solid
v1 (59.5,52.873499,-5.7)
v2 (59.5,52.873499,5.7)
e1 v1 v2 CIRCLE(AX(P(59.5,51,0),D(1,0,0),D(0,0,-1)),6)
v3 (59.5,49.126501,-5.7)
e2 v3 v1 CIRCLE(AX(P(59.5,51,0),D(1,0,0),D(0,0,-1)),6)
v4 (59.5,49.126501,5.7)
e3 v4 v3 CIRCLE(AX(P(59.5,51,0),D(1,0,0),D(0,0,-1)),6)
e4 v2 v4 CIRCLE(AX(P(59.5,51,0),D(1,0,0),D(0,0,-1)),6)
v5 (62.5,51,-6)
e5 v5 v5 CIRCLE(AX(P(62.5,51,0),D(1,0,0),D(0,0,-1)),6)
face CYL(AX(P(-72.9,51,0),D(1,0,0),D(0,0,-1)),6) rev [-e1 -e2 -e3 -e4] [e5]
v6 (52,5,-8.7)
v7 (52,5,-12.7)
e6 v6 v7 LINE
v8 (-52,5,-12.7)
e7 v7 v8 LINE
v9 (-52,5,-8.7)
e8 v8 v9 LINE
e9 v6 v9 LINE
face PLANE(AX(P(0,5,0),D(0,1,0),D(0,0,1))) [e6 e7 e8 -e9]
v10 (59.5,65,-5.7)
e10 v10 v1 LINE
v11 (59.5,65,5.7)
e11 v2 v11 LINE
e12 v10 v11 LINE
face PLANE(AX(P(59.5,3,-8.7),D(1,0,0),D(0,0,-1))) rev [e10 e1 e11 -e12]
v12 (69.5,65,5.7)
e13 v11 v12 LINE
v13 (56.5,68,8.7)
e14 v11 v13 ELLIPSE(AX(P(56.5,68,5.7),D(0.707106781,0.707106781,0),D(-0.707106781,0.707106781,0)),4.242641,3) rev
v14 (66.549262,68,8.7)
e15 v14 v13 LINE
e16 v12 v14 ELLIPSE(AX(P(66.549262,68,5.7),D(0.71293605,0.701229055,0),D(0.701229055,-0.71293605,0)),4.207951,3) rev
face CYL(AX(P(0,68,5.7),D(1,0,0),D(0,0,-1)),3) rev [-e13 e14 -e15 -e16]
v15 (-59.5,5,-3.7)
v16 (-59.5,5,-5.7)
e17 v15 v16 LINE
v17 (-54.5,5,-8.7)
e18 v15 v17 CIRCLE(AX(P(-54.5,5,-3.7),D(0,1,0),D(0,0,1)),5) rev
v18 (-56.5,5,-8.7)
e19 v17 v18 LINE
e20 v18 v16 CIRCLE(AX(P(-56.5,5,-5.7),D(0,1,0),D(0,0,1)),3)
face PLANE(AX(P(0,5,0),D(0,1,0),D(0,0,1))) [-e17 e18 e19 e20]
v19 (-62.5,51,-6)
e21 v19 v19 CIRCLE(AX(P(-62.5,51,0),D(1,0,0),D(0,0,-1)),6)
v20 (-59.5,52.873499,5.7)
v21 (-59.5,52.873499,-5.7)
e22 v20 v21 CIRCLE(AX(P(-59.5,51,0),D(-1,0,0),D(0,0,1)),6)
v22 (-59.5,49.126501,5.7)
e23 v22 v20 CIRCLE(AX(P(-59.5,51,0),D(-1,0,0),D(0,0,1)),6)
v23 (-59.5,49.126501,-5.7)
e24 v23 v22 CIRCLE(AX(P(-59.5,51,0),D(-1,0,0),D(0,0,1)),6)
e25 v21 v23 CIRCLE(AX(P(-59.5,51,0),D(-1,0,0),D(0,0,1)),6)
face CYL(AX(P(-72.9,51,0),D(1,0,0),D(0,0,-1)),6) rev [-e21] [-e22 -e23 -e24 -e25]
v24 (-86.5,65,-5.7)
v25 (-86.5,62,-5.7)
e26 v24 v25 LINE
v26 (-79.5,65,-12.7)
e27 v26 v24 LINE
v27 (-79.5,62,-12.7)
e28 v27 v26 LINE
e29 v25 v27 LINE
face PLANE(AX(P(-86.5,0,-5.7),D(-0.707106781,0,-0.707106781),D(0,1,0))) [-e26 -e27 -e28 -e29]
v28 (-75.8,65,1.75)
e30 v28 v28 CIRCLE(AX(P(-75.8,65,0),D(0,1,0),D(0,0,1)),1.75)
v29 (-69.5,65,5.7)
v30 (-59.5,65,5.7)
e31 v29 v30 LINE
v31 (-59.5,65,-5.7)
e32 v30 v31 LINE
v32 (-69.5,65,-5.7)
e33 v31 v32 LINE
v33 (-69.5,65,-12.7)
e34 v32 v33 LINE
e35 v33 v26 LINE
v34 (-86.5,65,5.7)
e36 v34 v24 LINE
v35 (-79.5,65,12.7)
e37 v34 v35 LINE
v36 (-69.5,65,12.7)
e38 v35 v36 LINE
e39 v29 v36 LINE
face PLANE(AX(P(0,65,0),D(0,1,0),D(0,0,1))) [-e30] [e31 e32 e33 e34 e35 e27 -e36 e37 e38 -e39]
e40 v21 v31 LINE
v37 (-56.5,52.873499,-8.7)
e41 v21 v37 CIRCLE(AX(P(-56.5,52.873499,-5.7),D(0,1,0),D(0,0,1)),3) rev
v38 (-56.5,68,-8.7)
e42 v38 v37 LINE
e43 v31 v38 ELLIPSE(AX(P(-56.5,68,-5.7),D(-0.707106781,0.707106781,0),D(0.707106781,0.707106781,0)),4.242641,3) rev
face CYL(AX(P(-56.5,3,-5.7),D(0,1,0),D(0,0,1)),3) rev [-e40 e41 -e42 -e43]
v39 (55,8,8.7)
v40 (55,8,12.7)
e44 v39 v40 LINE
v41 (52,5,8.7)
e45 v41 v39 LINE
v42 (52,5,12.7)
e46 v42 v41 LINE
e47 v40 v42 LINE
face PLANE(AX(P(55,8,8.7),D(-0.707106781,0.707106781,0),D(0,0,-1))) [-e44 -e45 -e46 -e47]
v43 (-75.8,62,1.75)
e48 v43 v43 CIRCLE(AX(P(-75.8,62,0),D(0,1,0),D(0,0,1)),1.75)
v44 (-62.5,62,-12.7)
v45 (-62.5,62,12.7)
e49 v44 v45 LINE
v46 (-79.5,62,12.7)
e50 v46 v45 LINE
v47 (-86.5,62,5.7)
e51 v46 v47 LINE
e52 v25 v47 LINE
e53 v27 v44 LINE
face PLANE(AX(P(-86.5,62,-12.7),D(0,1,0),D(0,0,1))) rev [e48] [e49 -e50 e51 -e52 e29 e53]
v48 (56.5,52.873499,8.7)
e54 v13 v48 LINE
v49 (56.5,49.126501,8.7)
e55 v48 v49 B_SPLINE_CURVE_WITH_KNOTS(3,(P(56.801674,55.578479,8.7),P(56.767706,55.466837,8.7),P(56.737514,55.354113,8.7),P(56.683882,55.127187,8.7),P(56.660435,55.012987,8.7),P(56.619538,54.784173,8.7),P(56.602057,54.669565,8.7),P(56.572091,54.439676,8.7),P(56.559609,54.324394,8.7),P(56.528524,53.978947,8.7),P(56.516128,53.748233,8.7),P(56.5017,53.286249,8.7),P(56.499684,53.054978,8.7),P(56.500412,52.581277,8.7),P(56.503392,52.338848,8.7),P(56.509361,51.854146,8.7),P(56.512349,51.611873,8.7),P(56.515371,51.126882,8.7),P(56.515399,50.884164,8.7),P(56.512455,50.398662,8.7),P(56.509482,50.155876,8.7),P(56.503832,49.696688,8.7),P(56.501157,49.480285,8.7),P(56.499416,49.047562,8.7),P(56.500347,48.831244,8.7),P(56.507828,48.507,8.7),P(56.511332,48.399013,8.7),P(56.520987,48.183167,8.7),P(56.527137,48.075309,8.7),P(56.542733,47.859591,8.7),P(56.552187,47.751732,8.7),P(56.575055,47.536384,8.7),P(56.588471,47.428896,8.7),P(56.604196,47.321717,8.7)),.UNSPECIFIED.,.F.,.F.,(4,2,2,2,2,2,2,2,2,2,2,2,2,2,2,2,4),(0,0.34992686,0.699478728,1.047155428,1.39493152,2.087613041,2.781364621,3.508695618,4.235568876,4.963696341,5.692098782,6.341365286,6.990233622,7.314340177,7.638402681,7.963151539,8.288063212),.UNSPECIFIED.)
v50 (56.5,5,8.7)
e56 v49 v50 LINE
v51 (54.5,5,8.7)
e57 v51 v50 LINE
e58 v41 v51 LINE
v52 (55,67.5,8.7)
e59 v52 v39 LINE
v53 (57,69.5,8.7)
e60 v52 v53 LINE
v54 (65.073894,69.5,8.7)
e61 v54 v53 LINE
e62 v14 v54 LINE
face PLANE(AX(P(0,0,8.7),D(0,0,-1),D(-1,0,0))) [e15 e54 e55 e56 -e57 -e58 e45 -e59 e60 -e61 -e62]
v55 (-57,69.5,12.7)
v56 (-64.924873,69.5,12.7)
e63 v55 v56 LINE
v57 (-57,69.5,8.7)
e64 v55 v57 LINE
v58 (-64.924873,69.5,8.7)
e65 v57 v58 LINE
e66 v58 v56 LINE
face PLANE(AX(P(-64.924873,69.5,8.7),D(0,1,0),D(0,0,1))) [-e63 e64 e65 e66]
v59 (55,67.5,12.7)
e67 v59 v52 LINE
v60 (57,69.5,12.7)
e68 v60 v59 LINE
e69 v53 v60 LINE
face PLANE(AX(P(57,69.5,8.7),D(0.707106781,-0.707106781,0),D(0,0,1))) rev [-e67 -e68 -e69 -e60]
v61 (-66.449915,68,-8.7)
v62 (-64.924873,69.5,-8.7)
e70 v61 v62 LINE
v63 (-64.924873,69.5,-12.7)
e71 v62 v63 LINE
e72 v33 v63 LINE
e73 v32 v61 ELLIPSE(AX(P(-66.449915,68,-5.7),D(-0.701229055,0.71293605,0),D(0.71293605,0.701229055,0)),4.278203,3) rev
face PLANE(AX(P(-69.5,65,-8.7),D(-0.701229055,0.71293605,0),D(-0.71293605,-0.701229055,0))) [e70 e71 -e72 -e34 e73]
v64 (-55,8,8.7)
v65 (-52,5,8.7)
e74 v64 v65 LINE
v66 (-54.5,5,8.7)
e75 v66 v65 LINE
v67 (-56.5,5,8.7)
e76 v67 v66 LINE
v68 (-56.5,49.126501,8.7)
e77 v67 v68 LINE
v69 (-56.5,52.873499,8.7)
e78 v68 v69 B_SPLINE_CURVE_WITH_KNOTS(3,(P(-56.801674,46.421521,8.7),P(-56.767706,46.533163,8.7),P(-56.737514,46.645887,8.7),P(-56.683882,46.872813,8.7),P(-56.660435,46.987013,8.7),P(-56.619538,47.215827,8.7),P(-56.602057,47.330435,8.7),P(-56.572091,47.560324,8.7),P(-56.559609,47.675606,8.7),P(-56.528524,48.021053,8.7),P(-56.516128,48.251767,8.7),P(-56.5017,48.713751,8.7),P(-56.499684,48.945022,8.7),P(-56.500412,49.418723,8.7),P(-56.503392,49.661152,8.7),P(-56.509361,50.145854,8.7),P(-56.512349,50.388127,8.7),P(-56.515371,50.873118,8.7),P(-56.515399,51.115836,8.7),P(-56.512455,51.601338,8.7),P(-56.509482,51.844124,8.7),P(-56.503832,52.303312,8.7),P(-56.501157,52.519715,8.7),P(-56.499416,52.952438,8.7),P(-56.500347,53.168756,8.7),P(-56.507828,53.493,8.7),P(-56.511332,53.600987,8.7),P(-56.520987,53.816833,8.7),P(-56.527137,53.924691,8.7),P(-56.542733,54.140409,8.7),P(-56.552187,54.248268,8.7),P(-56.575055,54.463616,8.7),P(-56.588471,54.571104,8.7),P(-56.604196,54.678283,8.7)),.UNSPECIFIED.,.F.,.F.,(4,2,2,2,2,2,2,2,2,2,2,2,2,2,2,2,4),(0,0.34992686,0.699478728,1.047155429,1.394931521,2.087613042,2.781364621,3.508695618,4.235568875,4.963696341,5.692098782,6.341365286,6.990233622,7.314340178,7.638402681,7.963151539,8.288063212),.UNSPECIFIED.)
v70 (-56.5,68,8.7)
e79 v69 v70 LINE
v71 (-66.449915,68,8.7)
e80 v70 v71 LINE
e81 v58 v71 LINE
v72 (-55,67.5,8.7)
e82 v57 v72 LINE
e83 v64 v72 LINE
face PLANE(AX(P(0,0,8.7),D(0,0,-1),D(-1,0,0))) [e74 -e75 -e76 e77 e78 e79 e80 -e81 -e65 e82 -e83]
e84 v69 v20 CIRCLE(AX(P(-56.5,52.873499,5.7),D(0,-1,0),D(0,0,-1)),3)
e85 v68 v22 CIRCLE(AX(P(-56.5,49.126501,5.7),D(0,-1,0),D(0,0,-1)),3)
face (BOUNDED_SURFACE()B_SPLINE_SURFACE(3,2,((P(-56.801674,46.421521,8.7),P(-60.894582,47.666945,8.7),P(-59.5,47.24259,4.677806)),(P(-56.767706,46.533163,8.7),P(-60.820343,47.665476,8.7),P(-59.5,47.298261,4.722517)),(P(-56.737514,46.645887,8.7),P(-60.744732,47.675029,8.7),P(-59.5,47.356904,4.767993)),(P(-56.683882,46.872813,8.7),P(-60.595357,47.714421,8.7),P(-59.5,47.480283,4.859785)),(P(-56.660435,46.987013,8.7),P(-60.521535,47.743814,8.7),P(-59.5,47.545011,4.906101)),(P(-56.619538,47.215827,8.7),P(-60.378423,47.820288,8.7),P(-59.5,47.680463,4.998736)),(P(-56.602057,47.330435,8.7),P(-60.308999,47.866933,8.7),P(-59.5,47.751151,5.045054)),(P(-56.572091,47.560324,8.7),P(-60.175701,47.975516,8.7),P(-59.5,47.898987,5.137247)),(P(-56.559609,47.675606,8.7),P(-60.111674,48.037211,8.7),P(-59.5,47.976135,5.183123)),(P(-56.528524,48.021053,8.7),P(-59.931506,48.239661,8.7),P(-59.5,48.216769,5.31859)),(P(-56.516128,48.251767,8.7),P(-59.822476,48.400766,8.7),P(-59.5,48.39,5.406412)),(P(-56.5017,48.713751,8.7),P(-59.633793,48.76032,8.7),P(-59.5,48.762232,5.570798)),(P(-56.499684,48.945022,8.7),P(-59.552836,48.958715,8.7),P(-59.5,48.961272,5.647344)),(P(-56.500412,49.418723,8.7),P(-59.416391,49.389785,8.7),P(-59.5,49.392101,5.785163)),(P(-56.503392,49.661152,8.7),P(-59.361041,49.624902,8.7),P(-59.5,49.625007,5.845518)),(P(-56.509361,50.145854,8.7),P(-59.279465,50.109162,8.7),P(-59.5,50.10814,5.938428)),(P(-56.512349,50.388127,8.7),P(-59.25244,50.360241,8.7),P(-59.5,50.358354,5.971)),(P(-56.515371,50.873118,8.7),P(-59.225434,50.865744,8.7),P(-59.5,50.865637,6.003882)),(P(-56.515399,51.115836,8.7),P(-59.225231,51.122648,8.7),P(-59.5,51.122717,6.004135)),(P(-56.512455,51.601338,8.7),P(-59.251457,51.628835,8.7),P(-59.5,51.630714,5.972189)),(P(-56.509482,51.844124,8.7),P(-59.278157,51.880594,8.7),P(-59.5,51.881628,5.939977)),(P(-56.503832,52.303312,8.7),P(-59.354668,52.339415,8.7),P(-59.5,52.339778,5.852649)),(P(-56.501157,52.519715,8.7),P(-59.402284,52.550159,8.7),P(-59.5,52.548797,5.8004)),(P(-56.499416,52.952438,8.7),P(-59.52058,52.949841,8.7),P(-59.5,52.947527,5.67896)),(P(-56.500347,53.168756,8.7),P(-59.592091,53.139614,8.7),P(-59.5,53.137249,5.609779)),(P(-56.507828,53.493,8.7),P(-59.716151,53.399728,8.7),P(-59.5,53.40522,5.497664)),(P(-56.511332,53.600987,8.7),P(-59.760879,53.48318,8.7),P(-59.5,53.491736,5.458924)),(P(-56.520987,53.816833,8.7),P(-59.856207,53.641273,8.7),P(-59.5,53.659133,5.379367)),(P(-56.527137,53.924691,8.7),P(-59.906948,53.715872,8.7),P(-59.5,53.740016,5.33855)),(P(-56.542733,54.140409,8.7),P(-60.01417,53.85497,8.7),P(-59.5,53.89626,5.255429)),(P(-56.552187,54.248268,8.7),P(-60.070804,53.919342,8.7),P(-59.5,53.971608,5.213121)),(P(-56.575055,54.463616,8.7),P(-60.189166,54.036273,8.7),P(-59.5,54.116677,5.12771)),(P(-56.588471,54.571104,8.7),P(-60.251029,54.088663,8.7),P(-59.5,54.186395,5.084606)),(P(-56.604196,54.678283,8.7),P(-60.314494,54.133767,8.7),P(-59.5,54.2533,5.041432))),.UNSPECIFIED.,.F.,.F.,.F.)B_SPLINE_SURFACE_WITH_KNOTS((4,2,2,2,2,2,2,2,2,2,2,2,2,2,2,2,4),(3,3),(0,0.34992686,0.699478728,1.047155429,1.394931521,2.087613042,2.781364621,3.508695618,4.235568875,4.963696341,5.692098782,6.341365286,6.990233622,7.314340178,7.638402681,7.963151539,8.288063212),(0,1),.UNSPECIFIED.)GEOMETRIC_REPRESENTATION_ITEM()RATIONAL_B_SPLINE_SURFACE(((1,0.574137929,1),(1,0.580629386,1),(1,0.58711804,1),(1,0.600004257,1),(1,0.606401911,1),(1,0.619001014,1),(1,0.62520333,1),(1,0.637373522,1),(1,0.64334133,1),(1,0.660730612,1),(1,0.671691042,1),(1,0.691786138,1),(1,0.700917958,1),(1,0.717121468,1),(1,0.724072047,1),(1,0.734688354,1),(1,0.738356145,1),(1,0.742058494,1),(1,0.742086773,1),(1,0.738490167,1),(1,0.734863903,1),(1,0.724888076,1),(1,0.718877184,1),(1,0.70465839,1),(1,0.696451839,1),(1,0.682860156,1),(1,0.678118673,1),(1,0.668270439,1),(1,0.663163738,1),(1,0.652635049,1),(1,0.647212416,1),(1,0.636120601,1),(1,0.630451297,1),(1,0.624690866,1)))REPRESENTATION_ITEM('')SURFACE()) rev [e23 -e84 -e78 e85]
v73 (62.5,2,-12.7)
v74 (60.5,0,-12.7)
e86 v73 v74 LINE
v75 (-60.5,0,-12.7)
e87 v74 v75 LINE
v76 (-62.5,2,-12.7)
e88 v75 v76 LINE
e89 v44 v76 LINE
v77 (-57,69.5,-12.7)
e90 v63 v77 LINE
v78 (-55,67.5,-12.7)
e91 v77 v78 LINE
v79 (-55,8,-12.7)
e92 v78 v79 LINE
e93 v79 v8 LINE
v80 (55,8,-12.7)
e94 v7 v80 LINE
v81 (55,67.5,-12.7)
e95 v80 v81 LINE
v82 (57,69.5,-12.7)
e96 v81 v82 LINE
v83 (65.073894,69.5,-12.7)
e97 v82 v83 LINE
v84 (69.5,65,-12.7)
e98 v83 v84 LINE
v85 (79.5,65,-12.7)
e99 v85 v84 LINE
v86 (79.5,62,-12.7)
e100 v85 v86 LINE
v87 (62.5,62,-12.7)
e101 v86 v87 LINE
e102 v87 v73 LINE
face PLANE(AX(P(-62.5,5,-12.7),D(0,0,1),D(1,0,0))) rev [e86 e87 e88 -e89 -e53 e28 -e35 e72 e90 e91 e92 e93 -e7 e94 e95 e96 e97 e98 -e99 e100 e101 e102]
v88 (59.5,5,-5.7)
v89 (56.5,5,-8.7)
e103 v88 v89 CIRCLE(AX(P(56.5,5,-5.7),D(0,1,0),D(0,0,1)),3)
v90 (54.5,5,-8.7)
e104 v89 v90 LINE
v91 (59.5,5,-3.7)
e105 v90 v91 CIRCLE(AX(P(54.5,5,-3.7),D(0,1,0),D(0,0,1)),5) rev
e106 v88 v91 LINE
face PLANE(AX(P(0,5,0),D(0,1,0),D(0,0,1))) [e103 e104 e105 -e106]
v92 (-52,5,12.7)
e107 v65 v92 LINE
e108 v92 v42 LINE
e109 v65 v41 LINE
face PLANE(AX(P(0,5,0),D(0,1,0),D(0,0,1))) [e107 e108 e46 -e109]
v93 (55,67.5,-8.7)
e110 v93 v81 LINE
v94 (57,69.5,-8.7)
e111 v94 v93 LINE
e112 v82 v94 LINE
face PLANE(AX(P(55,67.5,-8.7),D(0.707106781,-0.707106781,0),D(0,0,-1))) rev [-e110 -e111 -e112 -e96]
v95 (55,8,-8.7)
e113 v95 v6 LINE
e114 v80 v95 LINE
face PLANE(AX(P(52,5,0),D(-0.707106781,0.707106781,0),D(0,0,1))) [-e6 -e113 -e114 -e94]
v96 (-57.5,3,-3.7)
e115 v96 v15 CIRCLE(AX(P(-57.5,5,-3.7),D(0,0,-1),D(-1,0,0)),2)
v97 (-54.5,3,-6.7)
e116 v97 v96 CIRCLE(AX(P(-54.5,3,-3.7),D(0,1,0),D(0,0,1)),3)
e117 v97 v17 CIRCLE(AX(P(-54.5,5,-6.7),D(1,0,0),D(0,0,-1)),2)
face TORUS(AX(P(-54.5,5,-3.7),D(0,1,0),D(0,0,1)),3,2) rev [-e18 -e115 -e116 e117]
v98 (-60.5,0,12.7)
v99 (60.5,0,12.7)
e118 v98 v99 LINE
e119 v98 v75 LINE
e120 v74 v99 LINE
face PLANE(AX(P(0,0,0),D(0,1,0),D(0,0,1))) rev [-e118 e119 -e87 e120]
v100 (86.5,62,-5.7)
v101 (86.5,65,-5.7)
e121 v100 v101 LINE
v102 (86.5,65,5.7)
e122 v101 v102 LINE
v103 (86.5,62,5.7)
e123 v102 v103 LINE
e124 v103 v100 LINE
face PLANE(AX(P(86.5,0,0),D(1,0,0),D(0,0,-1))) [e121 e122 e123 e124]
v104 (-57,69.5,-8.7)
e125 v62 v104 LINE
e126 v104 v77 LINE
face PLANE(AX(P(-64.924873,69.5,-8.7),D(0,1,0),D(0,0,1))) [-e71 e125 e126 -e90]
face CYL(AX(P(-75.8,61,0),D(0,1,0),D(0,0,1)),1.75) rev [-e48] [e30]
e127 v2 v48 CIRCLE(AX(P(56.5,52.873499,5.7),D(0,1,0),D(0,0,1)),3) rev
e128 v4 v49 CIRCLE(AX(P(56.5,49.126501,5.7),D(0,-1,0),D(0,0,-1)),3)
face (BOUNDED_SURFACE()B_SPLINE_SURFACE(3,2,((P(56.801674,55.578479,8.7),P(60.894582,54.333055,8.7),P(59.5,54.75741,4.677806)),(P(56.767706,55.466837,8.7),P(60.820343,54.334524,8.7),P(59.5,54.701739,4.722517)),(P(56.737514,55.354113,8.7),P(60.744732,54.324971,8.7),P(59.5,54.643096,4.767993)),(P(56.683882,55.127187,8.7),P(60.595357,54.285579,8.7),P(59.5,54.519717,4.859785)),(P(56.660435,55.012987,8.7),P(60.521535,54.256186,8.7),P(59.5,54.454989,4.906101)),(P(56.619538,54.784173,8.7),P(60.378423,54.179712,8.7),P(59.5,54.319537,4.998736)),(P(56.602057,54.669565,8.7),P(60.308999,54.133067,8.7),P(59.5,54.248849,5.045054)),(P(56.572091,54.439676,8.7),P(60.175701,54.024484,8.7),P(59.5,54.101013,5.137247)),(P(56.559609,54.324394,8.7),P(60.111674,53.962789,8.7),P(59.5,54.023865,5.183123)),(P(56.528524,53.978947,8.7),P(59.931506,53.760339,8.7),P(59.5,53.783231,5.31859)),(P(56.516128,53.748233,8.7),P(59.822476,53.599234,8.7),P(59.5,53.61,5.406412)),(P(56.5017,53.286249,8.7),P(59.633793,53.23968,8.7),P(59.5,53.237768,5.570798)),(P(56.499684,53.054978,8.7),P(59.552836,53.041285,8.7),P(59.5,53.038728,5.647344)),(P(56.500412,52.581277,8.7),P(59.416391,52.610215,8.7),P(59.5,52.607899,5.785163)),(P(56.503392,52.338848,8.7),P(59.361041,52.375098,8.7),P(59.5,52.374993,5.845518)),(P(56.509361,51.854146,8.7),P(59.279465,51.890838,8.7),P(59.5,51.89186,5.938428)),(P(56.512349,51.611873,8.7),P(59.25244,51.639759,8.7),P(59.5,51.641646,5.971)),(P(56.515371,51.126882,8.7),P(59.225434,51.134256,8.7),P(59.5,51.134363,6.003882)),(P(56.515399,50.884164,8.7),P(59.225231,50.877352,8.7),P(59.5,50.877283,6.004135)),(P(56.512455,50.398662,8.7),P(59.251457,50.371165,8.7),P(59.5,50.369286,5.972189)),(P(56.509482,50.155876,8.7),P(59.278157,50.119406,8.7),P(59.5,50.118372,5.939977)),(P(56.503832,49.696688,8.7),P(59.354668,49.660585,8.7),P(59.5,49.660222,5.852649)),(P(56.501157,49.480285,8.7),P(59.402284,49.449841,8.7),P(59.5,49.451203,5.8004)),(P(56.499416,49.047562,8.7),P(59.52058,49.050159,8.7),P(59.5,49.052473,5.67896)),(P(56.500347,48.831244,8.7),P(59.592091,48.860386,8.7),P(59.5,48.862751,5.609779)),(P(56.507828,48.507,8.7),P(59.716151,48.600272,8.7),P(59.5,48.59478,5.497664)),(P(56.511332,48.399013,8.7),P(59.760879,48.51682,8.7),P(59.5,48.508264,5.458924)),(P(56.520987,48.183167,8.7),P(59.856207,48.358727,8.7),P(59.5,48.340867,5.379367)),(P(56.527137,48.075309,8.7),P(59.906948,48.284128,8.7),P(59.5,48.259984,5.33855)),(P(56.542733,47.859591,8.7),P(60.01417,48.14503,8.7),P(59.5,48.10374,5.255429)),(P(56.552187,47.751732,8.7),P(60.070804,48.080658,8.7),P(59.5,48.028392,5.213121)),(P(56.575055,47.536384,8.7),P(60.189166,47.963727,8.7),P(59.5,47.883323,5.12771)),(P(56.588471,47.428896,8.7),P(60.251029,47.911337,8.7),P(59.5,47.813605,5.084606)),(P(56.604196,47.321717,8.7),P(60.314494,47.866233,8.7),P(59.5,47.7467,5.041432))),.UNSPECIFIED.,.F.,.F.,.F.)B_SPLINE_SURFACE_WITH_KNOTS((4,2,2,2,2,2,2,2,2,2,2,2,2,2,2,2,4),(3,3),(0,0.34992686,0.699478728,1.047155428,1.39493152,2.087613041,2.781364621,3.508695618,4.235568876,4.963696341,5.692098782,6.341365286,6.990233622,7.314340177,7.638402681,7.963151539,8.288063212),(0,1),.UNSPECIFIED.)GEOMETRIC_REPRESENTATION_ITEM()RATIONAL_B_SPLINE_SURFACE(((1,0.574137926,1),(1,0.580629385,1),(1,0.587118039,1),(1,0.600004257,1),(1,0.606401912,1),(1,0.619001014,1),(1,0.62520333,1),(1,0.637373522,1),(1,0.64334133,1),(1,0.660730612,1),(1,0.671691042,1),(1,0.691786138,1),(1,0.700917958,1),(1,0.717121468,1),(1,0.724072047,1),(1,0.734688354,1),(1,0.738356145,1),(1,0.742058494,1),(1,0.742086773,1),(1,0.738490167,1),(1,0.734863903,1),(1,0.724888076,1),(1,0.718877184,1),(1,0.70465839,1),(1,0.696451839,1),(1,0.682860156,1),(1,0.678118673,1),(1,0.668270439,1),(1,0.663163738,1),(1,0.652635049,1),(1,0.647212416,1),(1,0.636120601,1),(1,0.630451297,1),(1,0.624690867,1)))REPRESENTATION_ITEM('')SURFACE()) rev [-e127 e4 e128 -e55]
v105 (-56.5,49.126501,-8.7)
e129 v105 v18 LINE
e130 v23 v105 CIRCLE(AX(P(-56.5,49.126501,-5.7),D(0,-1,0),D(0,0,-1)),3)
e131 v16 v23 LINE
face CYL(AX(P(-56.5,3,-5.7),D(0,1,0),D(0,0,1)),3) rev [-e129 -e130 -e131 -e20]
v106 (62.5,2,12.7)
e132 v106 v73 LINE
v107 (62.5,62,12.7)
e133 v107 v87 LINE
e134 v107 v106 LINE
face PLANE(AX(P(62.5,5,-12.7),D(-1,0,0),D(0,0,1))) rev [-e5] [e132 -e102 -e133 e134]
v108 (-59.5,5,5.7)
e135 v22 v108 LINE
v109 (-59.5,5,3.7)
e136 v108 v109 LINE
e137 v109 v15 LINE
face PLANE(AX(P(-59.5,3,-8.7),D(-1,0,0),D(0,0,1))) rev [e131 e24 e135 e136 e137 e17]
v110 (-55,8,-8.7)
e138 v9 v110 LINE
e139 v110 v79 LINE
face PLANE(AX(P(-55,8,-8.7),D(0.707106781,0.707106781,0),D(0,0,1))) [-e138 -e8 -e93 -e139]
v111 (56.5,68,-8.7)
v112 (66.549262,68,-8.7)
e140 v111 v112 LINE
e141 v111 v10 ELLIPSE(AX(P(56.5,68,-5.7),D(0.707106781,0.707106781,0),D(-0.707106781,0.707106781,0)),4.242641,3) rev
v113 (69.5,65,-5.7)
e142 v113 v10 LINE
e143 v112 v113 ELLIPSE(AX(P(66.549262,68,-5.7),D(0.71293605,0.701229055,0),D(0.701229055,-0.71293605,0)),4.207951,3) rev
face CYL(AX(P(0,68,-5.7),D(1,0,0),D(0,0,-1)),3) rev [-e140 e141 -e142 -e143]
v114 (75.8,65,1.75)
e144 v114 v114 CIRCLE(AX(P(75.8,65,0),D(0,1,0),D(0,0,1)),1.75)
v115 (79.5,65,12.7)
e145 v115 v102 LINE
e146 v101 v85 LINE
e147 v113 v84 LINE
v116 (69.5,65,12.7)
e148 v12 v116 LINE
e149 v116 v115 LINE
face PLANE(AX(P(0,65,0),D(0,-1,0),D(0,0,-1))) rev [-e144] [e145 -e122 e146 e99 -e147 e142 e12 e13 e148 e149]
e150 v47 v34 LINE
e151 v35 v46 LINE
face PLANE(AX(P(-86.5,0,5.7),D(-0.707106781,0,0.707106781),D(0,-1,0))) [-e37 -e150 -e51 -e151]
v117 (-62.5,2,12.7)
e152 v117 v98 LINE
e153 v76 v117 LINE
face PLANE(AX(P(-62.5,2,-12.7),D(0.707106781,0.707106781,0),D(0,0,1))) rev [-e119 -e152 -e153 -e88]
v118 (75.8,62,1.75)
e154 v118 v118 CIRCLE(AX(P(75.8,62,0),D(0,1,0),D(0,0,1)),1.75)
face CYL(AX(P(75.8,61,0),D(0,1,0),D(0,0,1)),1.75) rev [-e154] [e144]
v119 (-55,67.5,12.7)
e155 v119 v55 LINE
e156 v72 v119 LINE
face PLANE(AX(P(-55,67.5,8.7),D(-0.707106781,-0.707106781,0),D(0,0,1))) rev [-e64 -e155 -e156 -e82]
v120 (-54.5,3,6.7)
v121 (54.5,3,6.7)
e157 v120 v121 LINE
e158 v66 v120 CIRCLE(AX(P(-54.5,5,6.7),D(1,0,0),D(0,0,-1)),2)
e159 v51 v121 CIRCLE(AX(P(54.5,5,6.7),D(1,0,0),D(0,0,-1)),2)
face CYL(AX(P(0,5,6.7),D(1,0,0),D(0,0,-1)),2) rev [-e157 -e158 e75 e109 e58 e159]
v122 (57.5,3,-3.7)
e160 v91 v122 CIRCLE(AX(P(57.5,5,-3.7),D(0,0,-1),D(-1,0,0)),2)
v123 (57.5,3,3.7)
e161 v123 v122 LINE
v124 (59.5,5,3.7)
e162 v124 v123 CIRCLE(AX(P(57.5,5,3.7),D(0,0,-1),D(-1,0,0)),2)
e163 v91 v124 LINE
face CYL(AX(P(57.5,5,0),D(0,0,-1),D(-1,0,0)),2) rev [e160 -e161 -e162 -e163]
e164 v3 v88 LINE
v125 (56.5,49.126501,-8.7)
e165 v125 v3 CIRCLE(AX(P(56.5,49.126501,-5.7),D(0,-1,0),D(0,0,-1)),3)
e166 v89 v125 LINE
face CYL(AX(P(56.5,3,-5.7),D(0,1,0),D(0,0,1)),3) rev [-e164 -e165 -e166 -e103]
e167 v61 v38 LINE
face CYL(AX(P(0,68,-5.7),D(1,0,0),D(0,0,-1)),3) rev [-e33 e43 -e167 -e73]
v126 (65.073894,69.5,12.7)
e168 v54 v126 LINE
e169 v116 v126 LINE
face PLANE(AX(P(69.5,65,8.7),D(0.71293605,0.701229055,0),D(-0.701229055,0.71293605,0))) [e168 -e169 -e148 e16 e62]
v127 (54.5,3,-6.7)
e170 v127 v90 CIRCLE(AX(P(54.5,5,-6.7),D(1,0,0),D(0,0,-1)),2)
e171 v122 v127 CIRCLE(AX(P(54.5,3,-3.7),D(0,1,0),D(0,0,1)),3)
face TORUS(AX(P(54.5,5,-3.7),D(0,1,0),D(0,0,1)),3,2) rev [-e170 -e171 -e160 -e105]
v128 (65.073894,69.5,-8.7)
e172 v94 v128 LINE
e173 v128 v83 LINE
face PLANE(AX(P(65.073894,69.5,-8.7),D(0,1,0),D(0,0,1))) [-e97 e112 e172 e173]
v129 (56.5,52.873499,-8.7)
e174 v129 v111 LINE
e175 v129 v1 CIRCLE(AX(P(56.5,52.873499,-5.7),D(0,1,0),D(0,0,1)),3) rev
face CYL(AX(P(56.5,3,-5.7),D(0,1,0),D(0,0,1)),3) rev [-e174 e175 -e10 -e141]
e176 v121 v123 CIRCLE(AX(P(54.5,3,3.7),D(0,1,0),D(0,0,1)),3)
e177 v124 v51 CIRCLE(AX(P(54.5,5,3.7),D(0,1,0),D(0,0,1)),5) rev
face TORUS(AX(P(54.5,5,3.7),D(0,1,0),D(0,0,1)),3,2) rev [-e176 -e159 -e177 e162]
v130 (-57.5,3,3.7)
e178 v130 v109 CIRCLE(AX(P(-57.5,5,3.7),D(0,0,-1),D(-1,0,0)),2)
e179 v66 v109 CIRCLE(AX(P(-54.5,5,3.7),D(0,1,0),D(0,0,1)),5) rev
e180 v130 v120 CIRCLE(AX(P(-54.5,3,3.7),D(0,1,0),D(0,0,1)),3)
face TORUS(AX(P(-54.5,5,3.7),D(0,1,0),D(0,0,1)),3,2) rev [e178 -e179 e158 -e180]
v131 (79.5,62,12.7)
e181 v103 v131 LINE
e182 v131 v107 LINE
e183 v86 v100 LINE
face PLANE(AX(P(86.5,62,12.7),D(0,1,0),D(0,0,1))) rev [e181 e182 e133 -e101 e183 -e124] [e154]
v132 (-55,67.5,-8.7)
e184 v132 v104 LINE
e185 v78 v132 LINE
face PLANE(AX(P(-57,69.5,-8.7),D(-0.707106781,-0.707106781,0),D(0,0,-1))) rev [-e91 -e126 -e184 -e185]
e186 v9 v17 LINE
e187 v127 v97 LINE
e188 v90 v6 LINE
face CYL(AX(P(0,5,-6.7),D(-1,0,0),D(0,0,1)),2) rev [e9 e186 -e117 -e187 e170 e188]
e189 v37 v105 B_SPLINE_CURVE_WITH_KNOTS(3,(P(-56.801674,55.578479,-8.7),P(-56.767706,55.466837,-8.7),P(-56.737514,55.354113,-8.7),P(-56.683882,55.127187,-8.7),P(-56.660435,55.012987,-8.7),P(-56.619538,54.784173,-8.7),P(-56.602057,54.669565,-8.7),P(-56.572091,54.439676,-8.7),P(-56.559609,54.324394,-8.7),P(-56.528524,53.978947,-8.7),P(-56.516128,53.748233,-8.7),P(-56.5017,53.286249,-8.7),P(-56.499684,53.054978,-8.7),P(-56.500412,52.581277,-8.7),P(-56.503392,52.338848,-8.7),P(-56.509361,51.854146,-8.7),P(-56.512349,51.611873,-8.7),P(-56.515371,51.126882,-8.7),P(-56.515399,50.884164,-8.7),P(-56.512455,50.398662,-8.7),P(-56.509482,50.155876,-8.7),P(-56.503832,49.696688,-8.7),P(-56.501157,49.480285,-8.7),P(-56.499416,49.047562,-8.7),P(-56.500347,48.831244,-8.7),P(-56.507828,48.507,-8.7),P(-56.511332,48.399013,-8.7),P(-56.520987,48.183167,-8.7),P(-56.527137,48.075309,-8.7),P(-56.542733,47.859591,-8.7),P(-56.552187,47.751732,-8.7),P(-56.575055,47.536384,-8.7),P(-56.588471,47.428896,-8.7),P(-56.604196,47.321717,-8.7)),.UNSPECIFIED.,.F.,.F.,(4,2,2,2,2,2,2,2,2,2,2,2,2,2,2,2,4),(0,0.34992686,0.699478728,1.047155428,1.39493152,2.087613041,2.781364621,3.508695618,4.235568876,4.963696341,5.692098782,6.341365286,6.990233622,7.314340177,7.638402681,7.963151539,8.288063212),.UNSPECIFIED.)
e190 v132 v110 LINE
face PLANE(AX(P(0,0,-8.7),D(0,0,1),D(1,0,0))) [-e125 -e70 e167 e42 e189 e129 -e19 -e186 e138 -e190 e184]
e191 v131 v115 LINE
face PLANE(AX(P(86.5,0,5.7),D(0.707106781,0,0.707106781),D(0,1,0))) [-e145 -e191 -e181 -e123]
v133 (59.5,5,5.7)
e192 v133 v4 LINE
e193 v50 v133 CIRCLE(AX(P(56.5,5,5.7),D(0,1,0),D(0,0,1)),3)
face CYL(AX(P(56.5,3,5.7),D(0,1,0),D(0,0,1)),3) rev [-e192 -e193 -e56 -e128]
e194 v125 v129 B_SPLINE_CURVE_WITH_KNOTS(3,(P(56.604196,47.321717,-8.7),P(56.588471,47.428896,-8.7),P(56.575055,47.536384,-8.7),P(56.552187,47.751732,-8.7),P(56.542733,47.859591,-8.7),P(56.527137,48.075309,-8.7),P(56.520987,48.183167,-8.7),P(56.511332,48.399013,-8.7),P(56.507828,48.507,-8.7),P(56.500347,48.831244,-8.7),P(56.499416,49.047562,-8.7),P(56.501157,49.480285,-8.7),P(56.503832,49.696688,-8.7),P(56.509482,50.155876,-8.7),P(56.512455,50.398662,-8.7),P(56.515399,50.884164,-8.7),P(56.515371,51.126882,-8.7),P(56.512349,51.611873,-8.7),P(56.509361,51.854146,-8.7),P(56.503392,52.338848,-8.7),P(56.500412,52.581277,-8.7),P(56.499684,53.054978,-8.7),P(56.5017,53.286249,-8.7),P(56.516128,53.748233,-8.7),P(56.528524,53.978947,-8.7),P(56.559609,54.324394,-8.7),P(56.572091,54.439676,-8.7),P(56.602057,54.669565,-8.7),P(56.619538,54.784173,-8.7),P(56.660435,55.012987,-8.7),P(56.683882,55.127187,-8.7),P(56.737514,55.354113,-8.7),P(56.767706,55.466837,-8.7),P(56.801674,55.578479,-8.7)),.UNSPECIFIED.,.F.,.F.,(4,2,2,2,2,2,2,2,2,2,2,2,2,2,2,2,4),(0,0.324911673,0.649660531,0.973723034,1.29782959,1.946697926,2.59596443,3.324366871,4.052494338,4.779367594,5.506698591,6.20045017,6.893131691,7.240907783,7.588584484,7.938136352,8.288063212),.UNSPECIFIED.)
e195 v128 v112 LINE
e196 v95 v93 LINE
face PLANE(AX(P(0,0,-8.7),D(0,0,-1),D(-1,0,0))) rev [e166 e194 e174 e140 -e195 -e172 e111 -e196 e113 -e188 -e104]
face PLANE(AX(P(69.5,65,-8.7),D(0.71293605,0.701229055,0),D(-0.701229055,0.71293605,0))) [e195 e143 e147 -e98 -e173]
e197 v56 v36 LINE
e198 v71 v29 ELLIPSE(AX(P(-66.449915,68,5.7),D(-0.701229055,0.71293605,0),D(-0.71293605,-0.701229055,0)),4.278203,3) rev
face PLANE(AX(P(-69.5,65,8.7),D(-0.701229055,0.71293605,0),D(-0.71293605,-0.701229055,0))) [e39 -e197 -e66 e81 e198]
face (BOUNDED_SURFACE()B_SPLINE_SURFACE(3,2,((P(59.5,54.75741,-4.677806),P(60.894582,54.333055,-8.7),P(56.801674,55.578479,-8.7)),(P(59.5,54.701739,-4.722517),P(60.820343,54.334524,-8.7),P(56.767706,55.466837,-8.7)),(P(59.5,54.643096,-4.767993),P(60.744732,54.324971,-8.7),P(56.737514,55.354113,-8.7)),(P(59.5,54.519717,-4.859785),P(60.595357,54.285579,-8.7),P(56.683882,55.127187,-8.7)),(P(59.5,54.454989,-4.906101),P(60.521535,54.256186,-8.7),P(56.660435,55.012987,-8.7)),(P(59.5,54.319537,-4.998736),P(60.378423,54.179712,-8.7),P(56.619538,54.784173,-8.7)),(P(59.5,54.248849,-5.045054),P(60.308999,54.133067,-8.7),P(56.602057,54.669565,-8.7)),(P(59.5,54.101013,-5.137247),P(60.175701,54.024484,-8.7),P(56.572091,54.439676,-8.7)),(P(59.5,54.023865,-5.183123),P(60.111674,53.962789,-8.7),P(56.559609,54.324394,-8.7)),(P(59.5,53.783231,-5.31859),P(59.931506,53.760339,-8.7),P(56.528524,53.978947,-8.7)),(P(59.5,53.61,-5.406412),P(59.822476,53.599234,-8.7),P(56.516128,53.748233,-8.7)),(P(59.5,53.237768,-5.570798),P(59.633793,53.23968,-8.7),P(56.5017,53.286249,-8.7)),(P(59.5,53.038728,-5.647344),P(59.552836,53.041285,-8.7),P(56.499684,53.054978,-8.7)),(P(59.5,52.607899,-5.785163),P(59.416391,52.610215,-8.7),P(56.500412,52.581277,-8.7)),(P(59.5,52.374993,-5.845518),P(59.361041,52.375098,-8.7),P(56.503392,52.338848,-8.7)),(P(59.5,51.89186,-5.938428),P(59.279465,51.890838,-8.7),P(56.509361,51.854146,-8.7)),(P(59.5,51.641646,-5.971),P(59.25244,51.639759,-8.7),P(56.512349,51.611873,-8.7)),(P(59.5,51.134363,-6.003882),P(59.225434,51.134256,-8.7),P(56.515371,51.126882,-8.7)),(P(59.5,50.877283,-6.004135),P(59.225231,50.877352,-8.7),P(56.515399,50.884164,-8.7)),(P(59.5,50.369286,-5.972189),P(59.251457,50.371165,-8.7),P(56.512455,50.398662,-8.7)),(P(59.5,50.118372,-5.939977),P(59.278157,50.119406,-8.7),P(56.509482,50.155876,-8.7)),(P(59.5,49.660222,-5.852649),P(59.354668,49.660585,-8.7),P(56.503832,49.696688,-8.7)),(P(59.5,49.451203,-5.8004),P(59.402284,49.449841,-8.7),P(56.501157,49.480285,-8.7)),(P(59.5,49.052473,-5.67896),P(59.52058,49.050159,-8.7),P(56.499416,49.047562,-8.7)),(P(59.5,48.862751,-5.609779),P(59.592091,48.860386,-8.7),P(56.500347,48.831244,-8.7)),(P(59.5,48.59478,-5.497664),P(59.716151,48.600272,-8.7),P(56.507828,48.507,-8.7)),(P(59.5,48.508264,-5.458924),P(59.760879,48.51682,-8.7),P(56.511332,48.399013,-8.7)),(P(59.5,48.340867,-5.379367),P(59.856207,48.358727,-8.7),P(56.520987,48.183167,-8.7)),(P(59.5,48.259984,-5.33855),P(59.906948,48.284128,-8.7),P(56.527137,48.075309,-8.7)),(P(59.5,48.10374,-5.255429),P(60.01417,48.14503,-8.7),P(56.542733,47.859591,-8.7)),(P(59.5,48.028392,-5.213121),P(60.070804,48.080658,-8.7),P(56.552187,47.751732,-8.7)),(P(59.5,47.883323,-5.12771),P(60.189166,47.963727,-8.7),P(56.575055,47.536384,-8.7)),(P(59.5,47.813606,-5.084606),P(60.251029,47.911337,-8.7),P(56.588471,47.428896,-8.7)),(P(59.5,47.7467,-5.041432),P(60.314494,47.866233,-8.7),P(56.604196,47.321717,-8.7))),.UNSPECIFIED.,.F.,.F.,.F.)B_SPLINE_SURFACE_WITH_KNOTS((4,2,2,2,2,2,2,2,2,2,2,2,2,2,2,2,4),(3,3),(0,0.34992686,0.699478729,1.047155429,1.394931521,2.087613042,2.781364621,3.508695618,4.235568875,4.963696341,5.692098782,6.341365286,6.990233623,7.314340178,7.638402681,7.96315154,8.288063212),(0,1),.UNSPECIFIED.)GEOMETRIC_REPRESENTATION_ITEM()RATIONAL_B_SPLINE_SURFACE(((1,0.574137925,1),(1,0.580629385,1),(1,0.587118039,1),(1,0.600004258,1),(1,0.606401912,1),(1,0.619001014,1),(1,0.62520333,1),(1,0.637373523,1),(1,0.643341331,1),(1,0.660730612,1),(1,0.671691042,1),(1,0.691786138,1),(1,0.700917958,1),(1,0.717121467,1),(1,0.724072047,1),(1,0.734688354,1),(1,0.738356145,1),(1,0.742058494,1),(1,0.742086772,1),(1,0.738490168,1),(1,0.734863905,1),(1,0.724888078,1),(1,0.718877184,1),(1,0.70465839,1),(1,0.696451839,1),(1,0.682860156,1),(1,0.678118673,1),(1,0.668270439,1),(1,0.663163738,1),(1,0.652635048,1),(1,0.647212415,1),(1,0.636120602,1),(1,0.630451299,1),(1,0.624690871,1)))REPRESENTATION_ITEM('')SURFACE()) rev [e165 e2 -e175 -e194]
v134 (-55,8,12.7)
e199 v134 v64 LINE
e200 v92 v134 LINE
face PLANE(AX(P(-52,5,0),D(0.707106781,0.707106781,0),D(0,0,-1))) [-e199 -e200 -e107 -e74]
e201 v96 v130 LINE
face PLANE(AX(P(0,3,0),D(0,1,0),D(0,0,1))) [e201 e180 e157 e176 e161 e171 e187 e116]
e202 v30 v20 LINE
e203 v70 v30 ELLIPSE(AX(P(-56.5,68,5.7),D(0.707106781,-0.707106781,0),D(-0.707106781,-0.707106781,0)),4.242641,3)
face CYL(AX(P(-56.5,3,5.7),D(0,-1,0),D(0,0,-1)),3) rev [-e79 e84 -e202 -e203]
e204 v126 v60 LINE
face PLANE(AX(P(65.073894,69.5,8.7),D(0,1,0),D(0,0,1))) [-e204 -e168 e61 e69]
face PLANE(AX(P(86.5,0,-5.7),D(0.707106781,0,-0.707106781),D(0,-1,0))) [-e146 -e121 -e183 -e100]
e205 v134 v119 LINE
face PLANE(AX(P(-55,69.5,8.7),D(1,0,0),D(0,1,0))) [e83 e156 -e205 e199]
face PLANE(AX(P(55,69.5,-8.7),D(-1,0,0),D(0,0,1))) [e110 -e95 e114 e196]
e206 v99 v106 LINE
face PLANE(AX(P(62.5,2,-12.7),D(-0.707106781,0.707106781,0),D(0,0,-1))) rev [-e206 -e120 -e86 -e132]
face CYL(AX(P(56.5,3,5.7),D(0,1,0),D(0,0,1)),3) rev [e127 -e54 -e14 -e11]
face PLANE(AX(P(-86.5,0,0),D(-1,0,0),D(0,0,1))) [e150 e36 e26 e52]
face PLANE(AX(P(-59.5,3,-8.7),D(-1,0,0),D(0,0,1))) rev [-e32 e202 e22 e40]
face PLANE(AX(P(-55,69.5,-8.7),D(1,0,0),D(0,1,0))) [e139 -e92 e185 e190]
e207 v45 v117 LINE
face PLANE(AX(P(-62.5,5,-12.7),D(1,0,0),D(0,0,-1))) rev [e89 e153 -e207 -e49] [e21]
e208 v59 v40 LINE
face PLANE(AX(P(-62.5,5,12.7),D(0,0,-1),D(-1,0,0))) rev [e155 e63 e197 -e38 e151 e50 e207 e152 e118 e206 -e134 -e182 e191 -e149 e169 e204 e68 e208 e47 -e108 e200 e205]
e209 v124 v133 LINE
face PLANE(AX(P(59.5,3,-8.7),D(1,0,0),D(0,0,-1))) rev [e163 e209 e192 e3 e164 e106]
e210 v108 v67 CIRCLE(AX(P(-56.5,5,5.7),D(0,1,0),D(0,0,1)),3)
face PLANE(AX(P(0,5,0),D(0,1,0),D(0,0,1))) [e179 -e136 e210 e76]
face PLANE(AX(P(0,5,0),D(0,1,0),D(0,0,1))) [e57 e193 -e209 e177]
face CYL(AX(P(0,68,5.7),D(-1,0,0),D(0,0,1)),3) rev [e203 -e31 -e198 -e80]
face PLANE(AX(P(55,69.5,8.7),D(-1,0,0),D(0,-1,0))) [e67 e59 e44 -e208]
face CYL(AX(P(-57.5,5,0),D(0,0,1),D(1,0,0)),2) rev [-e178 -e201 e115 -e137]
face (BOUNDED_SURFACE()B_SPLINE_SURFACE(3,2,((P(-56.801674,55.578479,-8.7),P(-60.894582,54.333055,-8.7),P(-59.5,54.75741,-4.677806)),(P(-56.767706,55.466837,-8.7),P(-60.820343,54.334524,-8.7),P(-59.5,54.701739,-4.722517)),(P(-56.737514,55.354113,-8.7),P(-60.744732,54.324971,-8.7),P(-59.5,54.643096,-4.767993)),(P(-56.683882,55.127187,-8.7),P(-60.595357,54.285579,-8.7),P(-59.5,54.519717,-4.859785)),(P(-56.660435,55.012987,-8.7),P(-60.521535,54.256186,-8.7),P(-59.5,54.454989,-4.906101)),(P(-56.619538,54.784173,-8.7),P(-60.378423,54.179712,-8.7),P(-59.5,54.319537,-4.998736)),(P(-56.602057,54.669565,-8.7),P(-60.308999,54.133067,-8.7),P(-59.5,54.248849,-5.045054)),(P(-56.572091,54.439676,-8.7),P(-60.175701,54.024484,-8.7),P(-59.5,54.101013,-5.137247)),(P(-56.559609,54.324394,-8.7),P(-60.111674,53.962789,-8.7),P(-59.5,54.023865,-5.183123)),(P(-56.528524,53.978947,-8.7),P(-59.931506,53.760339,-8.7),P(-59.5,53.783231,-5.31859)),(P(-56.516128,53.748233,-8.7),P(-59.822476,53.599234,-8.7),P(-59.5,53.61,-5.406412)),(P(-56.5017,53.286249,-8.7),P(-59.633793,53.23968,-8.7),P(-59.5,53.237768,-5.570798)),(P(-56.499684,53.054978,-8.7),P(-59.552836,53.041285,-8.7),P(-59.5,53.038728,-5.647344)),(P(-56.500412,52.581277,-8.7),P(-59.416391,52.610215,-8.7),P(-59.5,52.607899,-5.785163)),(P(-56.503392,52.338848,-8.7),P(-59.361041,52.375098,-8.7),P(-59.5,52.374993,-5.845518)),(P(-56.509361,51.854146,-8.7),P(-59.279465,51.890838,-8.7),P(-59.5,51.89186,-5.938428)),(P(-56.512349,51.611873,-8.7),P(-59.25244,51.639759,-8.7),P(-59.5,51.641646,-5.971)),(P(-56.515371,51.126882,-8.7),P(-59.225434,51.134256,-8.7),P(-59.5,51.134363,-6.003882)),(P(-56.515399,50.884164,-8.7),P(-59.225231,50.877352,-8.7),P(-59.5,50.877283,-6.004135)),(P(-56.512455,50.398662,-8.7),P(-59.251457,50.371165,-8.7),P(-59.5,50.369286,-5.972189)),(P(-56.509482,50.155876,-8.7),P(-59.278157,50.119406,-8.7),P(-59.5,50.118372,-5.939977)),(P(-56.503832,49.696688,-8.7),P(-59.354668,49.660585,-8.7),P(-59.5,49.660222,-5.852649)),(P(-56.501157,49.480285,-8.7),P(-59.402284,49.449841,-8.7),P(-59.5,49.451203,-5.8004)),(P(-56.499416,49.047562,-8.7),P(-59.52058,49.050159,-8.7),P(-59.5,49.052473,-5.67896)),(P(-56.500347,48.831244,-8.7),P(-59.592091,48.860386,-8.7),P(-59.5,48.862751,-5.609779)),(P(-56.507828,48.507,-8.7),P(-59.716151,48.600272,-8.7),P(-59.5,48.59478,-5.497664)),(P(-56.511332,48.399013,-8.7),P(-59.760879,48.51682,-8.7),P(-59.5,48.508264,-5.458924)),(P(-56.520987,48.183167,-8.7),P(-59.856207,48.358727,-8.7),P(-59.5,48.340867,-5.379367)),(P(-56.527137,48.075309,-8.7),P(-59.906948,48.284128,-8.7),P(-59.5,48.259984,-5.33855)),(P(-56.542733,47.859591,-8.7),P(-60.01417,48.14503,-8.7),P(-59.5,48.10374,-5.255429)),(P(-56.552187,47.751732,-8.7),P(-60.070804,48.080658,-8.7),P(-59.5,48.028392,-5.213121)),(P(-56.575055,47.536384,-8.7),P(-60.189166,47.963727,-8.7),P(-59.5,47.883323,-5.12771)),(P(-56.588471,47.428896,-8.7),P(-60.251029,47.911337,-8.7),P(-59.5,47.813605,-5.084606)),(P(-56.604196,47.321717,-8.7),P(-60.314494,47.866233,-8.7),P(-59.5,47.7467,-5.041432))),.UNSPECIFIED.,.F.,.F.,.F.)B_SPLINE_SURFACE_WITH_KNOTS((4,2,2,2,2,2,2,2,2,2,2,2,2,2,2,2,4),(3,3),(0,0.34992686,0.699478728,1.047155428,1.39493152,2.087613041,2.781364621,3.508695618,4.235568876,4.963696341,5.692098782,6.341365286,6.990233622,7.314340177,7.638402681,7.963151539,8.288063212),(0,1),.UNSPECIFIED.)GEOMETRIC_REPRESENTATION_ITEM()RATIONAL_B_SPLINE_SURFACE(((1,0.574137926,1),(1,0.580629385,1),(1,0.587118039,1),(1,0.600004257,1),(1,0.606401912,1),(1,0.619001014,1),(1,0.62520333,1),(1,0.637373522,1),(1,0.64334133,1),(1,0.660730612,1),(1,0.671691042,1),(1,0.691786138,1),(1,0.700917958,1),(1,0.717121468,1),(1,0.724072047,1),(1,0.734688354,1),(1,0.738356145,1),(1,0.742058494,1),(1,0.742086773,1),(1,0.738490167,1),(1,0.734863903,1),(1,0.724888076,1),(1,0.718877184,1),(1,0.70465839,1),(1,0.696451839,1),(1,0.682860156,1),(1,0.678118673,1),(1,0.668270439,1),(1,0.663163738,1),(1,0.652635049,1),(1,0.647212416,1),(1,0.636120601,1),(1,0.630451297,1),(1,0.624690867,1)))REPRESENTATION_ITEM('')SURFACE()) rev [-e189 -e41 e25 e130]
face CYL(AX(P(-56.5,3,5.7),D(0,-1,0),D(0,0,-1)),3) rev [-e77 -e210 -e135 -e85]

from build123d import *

# Parameters (mm, degrees)
SKETCH1_W           = 125
SKETCH1_H           = 25.4
BOSS_EXTRUDE1_DEPTH = 5
SKETCH2_W           = 119
SKETCH2_H           = 17.4
CUT_EXTRUDE1_DEPTH  = 2
FILLET1_R           = 5
SKETCH3_W           = 3
SKETCH3_H           = 25.4
BOSS_EXTRUDE2_DEPTH = 60
CHAMFER1_SIZE       = 2
SKETCH4_R           = 6
CUT_EXTRUDE3_DEPTH  = 135.4
SKETCH5_W           = 25.4
SKETCH5_H           = 3
BOSS_EXTRUDE3_DEPTH = 24
SKETCH6_W           = 25.4
SKETCH6_H           = 3
BOSS_EXTRUDE4_DEPTH = 24
SKETCH9_R           = 1.75
CUT_EXTRUDE4_DEPTH  = 4
CHAMFER2_SIZE       = 7
BOSS_EXTRUDE5_DEPTH = 4
BOSS_EXTRUDE6_DEPTH = 4
CHAMFER3_SIZE       = 2
CHAMFER4_SIZE       = 3
FILLET5_R           = 2
FILLET6_R           = 3


# Some blends are built 0.0001 mm under size
with BuildPart() as part:
    # Sketch1 → Boss-Extrude1 (new body)
    with BuildSketch(Plane(origin=(0, 0, 0), x_dir=(1, 0, 0), z_dir=(0, 1, 0))):
        Rectangle(SKETCH1_W, SKETCH1_H)
    extrude(amount=BOSS_EXTRUDE1_DEPTH)

    # Sketch2 → Cut-Extrude1 (cut)
    with BuildSketch(Plane(origin=(0, 5, 0), x_dir=(1, 0, 0), z_dir=(0, 1, 0))):
        Rectangle(SKETCH2_W, SKETCH2_H)
    extrude(amount=-CUT_EXTRUDE1_DEPTH, mode=Mode.SUBTRACT)

    # Fillet1
    fillet1_edges = [part.edges().sort_by_distance(p)[0] for p in [
        (59.5, 4, -8.7),
        (59.5, 4, 8.7),
        (-59.5, 4, 8.7),
        (-59.5, 4, -8.7),
    ]]
    fillet(fillet1_edges, radius=FILLET1_R)

    # Sketch3 → Boss-Extrude2 (add)
    with BuildSketch(Plane(origin=(0, 5, 0), x_dir=(1, 0, 0), z_dir=(0, 1, 0))):
        with Locations((61, 0)):
            Rectangle(SKETCH3_W, SKETCH3_H)
        with Locations((-61, 0)):
            Rectangle(SKETCH3_W, SKETCH3_H)
    extrude(amount=BOSS_EXTRUDE2_DEPTH)

    # Chamfer1
    chamfer1_edges = [part.edges().sort_by_distance(p)[0] for p in [
        (-62.5, 0, 0),
        (62.5, 0, 0),
    ]]
    chamfer(chamfer1_edges, length=CHAMFER1_SIZE)

    # Sketch4 → Cut-Extrude3 (cut)
    with BuildSketch(Plane(origin=(62.5, 0, 0), x_dir=(0, 0, -1), z_dir=(1, 0, 0))):
        with Locations((0, 51)):
            Circle(SKETCH4_R)
    extrude(amount=-CUT_EXTRUDE3_DEPTH, mode=Mode.SUBTRACT)

    # Sketch5 → Boss-Extrude3 (add)
    with BuildSketch(Plane.ZY.offset(62.5)):
        with Locations((0, 63.5)):
            Rectangle(SKETCH5_W, SKETCH5_H)
    extrude(amount=BOSS_EXTRUDE3_DEPTH)

    # Sketch6 → Boss-Extrude4 (add)
    with BuildSketch(Plane(origin=(62.5, 0, 0), x_dir=(0, 0, -1), z_dir=(1, 0, 0))):
        with Locations((0, 63.5)):
            Rectangle(SKETCH6_W, SKETCH6_H)
    extrude(amount=BOSS_EXTRUDE4_DEPTH)

    # Sketch9 → Cut-Extrude4 (cut)
    with BuildSketch(Plane(origin=(0, 65, 0), x_dir=(1, 0, 0), z_dir=(0, 1, 0))):
        with Locations(Location((75.8, 0, 0), (0, 0, 270))):
            Circle(SKETCH9_R)
        with Locations(Location((-75.8, 0, 0), (0, 0, 270))):
            Circle(SKETCH9_R)
    extrude(amount=-CUT_EXTRUDE4_DEPTH, mode=Mode.SUBTRACT)

    # Chamfer2
    chamfer2_edges = [part.edges().sort_by_distance(p)[0] for p in [
        (-86.5, 63.5, -12.7),
        (-86.5, 63.5, 12.7),
        (86.5, 63.5, 12.7),
        (86.5, 63.5, -12.7),
    ]]
    chamfer(chamfer2_edges, length=CHAMFER2_SIZE)

    # Sketch10 → Boss-Extrude5 (add)
    with BuildSketch(Plane.XY.offset(12.7)):
        Polygon((-69.5, 65), (-64.924872653, 69.5), (-55, 69.5), (-55, 5), (-59.5, 5), (-59.5, 65), align=None)
        Polygon((69.5, 65), (65.073893694, 69.5), (55, 69.5), (55, 5), (59.5, 5), (59.5, 65), align=None)
    extrude(amount=-BOSS_EXTRUDE5_DEPTH)

    # Sketch11 → Boss-Extrude6 (add)
    with BuildSketch(Plane(origin=(0, 0, -12.7), x_dir=(-1, 0, 0), z_dir=(0, 0, -1))):
        Polygon((-69.5, 65), (-65.073893694, 69.5), (-55, 69.5), (-55, 5), (-59.5, 5), (-59.5, 65), align=None)
        Polygon((69.5, 65), (64.924872653, 69.5), (55, 69.5), (55, 5), (59.5, 5), (59.5, 65), align=None)
    extrude(amount=-BOSS_EXTRUDE6_DEPTH)

    # Chamfer3
    chamfer3_edges = [part.edges().sort_by_distance(p)[0] for p in [
        (-55, 69.5, 10.7),
        (55, 69.5, 10.7),
        (55, 69.5, -10.7),
        (-55, 69.5, -10.7),
    ]]
    chamfer(chamfer3_edges, length=CHAMFER3_SIZE)

    # Chamfer4
    # the kernel refuses this chamfer: 3 mm, written as the material it adds along each edge
    with BuildSketch(Plane(origin=(-55, 5, 12.7), x_dir=(-0.02749587661058672, 0.9996219169112968, 0), z_dir=(0, 0, -1)), Plane(origin=(55, 5, 12.7), x_dir=(-0.9996219169112968, -0.02749587661058648, 0), z_dir=(0, 0, -1)), Plane(origin=(-55, 5, -12.7), x_dir=(0.9996219169112968, -0.02749587661058648, 0), z_dir=(0, 0, 1))) as chamfer4_piece_1:
        Polygon((CHAMFER4_SIZE * 0.999621916911, CHAMFER4_SIZE * 0.0274958766106), (-CHAMFER4_SIZE * 0.0274958766106, CHAMFER4_SIZE * 0.999621916911), (0, 0), align=None)
    extrude(amount=4)
    with BuildSketch(Plane(origin=(55, 5, -12.7), x_dir=(-0.9996219169112968, -0.02749587661058648, 0), z_dir=(0, 0, 1))) as chamfer4_piece_2:
        Polygon((CHAMFER4_SIZE * 0.999621916911, -CHAMFER4_SIZE * 0.0274958766106), (-CHAMFER4_SIZE * 0.0274958766106, -CHAMFER4_SIZE * 0.999621916911), (0, 0), align=None)
    extrude(amount=4)

    # Fillet5
    fillet5_edges = [part.edges().sort_by_distance(p)[0] for p in [
        (-58.035533906, 3, 7.235533906),
        (-59.5, 3, 0),
        (-58.035533906, 3, -7.235533906),
        (0, 3, -8.7),
        (58.035533906, 3, -7.235533906),
        (59.5, 3, 0),
        (58.035533906, 3, 7.235533906),
        (0, 3, 8.7),
    ]]
    fillet(fillet5_edges, radius=FILLET5_R - 0.0001)  # a hair under: the kernel refuses the full size

    # Fillet6
    fillet6_edges = [part.edges().sort_by_distance(p)[0] for p in [
        (-64.5, 65, 8.7),
        (-59.5, 35, 8.7),
        (64.5, 65, 8.7),
        (59.5, 35, 8.7),
        (64.5, 65, -8.7),
        (59.5, 35, -8.7),
        (-64.5, 65, -8.7),
        (-59.5, 35, -8.7),
    ]]
    fillet(fillet6_edges, radius=FILLET6_R)


solid = part.part
